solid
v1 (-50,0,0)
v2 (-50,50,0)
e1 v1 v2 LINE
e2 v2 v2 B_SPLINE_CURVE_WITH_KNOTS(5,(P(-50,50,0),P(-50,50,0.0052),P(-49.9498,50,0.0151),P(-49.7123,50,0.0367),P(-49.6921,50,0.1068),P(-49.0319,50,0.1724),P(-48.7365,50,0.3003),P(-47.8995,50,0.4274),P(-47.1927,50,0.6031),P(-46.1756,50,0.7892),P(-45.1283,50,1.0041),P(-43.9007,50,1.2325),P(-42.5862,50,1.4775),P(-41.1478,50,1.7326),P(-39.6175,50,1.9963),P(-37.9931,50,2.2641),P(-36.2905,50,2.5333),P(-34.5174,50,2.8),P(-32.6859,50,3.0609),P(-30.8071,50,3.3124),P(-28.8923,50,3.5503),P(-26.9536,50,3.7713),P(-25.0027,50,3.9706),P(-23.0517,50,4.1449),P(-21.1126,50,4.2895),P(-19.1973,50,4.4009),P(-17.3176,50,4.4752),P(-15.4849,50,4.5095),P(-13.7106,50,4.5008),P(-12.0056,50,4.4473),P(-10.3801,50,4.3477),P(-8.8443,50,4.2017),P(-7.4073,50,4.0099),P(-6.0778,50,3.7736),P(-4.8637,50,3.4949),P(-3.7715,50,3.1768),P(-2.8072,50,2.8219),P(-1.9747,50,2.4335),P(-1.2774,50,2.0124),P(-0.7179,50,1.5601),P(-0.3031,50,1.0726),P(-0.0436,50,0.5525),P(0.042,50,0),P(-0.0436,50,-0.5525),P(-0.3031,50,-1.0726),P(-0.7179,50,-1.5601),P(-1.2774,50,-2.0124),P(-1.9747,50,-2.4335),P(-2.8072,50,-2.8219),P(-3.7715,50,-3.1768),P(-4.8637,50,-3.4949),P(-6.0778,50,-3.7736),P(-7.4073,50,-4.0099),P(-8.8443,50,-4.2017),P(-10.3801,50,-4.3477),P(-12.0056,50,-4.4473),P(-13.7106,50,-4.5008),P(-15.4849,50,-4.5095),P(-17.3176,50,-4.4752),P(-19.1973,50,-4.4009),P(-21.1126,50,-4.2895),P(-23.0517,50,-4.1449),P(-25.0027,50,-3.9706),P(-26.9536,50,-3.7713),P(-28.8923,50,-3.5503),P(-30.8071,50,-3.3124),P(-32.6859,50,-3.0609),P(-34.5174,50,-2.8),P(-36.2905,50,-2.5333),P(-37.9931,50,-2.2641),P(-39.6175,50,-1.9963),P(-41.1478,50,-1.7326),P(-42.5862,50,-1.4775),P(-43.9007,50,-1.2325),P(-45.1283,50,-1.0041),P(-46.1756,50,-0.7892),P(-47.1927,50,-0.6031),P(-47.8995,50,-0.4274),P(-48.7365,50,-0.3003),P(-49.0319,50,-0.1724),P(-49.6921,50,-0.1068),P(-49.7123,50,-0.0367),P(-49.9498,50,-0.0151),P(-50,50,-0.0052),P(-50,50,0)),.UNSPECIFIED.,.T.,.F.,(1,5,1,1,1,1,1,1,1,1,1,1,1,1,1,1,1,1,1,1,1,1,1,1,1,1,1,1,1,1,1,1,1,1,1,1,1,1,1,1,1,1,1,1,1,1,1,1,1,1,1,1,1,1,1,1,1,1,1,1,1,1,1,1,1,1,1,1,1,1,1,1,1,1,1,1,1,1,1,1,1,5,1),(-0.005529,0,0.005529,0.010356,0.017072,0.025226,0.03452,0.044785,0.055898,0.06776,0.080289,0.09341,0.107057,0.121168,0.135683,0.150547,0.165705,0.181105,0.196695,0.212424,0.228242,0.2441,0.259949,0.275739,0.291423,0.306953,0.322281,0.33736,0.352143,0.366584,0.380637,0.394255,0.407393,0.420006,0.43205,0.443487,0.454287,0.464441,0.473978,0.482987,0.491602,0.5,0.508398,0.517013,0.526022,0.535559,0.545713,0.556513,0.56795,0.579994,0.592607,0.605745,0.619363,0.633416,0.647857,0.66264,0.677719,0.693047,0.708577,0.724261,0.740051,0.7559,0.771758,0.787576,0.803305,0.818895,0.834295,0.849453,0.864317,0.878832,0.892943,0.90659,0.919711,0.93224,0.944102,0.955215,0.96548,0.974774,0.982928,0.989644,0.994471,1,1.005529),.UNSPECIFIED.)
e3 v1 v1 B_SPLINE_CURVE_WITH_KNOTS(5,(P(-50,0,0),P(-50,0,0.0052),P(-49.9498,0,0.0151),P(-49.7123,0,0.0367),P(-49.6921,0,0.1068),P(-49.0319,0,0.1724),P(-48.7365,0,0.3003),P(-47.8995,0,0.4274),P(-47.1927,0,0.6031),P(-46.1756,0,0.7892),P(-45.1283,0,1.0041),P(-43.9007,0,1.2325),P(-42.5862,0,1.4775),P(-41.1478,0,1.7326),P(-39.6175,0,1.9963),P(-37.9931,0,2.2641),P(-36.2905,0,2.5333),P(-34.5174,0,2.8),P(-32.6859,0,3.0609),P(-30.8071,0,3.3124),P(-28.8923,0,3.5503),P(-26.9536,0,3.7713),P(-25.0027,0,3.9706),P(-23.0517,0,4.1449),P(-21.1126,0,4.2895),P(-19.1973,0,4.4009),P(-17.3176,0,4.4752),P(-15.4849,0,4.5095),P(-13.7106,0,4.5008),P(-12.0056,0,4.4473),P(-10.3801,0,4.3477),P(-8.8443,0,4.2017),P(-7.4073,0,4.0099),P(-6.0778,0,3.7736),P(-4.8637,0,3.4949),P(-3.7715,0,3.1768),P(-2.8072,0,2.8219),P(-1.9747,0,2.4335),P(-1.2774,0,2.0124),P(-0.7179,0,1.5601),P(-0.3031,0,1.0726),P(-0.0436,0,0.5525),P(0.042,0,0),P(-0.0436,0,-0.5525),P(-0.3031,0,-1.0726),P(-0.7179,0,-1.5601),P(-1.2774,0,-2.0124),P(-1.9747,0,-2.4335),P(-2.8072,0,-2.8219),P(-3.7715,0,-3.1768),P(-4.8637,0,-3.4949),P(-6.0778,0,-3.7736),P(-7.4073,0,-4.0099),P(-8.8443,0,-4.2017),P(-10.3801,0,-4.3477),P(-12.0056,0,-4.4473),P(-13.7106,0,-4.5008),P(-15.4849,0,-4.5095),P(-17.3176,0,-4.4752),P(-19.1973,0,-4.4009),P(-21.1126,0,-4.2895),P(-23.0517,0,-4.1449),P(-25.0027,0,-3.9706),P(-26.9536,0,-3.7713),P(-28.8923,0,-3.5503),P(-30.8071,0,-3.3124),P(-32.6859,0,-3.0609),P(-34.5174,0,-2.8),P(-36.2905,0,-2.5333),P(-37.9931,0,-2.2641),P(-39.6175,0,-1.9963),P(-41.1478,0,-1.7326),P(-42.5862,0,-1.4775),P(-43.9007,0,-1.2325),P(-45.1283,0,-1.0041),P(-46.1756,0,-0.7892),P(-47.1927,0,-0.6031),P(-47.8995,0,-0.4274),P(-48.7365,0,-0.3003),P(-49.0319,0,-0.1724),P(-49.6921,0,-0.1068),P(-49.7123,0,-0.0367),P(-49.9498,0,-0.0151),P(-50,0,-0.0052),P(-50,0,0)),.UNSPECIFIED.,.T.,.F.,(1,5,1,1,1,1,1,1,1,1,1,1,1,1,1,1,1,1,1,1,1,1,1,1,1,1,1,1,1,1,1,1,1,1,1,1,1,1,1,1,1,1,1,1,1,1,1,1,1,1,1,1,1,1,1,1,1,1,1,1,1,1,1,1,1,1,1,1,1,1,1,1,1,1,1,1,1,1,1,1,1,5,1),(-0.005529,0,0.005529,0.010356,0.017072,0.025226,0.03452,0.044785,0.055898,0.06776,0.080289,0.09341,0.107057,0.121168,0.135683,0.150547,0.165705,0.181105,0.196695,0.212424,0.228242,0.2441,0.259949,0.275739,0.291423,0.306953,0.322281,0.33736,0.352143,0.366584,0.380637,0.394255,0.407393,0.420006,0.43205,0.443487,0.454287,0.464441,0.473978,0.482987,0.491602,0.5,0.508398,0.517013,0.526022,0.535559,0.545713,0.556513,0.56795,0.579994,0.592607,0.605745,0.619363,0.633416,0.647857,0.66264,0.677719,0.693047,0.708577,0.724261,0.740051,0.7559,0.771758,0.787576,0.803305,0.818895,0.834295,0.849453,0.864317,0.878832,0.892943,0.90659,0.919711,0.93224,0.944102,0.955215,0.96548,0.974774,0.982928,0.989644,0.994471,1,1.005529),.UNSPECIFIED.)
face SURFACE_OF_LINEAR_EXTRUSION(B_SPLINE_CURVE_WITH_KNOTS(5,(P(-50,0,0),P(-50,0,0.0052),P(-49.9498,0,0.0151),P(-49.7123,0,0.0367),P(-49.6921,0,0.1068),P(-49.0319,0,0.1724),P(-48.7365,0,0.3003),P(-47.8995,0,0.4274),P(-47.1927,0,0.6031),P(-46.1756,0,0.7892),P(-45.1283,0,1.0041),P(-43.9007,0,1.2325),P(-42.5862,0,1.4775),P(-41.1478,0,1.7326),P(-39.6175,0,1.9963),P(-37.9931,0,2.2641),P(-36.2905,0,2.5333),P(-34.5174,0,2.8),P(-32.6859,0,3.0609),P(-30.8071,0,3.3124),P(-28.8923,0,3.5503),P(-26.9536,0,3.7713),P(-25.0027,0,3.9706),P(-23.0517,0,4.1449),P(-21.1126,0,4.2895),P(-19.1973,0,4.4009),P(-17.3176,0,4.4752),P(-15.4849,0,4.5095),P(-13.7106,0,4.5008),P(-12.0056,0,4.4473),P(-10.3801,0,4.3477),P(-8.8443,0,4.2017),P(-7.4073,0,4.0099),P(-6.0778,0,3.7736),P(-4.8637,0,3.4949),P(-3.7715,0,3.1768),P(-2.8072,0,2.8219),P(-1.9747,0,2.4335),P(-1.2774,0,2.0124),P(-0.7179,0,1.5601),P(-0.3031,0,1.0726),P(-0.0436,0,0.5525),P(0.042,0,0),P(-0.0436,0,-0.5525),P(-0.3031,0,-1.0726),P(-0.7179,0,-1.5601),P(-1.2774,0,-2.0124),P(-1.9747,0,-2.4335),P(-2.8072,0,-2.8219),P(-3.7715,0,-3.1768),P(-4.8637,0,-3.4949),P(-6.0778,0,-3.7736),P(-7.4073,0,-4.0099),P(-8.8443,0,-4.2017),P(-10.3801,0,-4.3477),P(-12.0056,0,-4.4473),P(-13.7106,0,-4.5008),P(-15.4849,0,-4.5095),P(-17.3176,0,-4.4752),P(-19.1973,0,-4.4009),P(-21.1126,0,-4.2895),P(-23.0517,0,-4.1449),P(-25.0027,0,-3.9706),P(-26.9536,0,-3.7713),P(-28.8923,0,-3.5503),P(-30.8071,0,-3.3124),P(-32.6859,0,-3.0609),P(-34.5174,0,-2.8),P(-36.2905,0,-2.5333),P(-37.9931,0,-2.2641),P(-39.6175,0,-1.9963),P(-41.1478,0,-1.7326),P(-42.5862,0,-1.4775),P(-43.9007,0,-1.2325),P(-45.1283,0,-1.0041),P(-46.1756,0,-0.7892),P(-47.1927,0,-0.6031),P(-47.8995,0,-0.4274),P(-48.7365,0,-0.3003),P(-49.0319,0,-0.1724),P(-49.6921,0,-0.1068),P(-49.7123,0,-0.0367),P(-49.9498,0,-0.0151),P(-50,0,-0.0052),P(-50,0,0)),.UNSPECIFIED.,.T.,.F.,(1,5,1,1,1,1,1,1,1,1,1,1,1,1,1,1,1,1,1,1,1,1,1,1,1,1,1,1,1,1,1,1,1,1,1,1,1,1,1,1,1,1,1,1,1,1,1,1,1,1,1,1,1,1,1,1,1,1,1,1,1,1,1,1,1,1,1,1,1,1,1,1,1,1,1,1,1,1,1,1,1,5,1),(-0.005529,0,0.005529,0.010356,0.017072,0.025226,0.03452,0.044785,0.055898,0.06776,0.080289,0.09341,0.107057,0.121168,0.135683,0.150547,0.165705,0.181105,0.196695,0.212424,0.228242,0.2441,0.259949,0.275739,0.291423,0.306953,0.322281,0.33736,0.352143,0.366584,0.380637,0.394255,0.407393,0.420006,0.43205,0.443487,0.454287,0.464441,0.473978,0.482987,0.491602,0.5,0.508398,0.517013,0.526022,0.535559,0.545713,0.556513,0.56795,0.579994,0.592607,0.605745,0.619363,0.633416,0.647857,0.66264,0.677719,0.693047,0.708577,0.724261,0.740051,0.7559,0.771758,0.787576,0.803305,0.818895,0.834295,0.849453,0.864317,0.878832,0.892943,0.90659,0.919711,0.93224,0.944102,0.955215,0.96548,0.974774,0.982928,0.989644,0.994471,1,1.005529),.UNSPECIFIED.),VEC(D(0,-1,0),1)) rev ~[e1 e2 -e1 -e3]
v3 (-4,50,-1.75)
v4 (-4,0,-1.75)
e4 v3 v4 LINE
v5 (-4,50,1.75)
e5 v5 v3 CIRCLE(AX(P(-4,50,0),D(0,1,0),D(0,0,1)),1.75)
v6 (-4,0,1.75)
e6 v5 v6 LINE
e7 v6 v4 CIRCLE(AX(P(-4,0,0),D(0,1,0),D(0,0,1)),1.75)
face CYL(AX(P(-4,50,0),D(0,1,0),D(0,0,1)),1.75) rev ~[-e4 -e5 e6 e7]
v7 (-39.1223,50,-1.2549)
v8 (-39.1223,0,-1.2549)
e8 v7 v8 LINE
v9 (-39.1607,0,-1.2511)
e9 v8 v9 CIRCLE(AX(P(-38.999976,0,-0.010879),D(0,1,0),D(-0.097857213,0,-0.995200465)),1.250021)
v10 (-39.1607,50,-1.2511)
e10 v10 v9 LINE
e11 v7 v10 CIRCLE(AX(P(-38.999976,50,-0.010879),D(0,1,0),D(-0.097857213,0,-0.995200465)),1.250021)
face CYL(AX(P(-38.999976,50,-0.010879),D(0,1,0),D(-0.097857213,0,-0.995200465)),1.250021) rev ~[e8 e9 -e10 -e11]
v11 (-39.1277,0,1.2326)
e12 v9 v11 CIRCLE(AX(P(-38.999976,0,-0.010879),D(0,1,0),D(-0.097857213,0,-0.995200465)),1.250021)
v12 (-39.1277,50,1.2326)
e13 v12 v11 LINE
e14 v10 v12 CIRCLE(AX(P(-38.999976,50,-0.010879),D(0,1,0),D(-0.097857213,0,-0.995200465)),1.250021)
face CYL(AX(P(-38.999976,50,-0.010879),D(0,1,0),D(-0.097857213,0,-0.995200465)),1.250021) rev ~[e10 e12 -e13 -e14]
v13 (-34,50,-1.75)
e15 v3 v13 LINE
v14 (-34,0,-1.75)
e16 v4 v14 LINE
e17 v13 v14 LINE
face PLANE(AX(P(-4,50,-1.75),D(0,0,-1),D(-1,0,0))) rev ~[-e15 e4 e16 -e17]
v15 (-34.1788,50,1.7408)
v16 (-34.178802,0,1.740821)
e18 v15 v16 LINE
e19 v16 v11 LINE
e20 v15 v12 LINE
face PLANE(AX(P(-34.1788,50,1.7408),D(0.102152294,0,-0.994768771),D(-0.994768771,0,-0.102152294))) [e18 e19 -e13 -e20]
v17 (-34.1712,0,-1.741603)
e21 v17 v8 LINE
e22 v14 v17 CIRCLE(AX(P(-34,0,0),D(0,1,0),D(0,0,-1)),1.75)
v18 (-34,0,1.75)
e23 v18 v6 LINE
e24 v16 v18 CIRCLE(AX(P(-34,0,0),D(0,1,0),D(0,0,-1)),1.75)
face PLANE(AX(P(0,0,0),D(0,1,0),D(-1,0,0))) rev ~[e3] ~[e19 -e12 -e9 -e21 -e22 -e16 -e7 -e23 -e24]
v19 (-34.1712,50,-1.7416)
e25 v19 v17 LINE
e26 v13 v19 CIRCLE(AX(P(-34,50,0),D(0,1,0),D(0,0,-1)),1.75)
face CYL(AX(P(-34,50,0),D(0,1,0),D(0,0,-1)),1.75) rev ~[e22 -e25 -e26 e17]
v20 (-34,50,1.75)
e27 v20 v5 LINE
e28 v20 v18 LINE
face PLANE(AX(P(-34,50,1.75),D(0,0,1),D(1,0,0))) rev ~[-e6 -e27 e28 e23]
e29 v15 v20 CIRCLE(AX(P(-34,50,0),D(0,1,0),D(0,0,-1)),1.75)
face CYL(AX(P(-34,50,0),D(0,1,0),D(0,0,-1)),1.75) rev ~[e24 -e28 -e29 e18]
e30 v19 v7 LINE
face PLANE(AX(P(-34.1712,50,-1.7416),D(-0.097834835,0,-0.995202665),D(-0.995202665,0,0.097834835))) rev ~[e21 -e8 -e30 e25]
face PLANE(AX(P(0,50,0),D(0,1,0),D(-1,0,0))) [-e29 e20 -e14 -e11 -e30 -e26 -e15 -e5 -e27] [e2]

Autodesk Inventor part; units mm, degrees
ref_plane "YZ Plane" through (0, 0, 0) normal (1, 0, 0) x (0, 1, 0)
ref_plane "XZ Plane" through (0, 0, 0) normal (0, 1, 0) x (-1, 0, 0)
ref_plane "XY Plane" through (0, 0, 0) normal (0, 0, 1) x (1, 0, 0)
sketch "草圖1" plane through (0, 0, 0) normal (0, 1, 0) x (-1, 0, 0)
  spline S0 degree 5 poles (50, 0) (50, 0.0052) (49.9498, 0.0151) (49.7123, 0.0367) (49.6921, 0.1068) (49.0319, 0.1724) (48.7365, 0.3003) (47.8995, 0.4274) (47.1927, 0.6031) (46.1756, 0.7892) (45.1283, 1.0041) (43.9007, 1.2325) (42.5862, 1.4775) (41.1478, 1.7326) (39.6175, 1.9963) (37.9931, 2.2641) (36.2905, 2.5333) (34.5174, 2.8) (32.6859, 3.0609) (30.8071, 3.3124) (28.8923, 3.5503) (26.9536, 3.7713) (25.0027, 3.9706) (23.0517, 4.1449) (21.1126, 4.2895) (19.1973, 4.4009) (17.3176, 4.4752) (15.4849, 4.5095) (13.7106, 4.5008) (12.0056, 4.4473) (10.3801, 4.3477) (8.8443, 4.2017) (7.4073, 4.0099) (6.0778, 3.7736) (4.8637, 3.4949) (3.7715, 3.1768) (2.8072, 2.8219) (1.9747, 2.4335) (1.2774, 2.0124) (0.7179, 1.5601) (0.3031, 1.0726) (0.0436, 0.5525) (-0.042, 0) (0.0436, -0.5525) (0.3031, -1.0726) (0.7179, -1.5601) (1.2774, -2.0124) (1.9747, -2.4335) (2.8072, -2.8219) (3.7715, -3.1768) (4.8637, -3.4949) (6.0778, -3.7736) (7.4073, -4.0099) (8.8443, -4.2017) (10.3801, -4.3477) (12.0056, -4.4473) (13.7106, -4.5008) (15.4849, -4.5095) (17.3176, -4.4752) (19.1973, -4.4009) (21.1126, -4.2895) (23.0517, -4.1449) (25.0027, -3.9706) (26.9536, -3.7713) (28.8923, -3.5503) (30.8071, -3.3124) (32.6859, -3.0609) (34.5174, -2.8) (36.2905, -2.5333) (37.9931, -2.2641) (39.6175, -1.9963) (41.1478, -1.7326) (42.5862, -1.4775) (43.9007, -1.2325) (45.1283, -1.0041) (46.1756, -0.7892) (47.1927, -0.6031) (47.8995, -0.4274) (48.7365, -0.3003) (49.0319, -0.1724) (49.6921, -0.1068) (49.7123, -0.0367) (49.9498, -0.0151) (50, -0.0052) (50, 0) knots 0 0 0 0 0 0 0.005529 0.010356 0.017072 0.025226 0.03452 0.044785 0.055898 0.06776 0.080289 0.09341 0.107057 0.121168 0.135683 0.150547 0.165705 0.181105 0.196695 0.212424 0.228242 0.2441 0.259949 0.275739 0.291423 0.306953 0.322281 0.33736 0.352143 0.366584 0.380637 0.394255 0.407393 0.420006 0.43205 0.443487 0.454287 0.464441 0.473978 0.482987 0.491602 0.5 0.508398 0.517013 0.526022 0.535559 0.545713 0.556513 0.56795 0.579994 0.592607 0.605745 0.619363 0.633416 0.647857 0.66264 0.677719 0.693047 0.708577 0.724261 0.740051 0.7559 0.771758 0.787576 0.803305 0.818895 0.834295 0.849453 0.864317 0.878832 0.892943 0.90659 0.919711 0.93224 0.944102 0.955215 0.96548 0.974774 0.982928 0.989644 0.994471 1 1 1 1 1 1
  point P0 (0, 0)
  point P1 (49.6922, 0.0669)
  point P2 (49.3093, 0.1492)
  point P3 (48.7764, 0.2626)
  point P4 (48.097, 0.4049)
  point P5 (47.2751, 0.5738)
  point P6 (46.316, 0.7666)
  point P7 (45.2254, 0.9803)
  point P8 (44.0102, 1.2119)
  point P9 (42.6776, 1.4579)
  point P10 (41.2362, 1.7151)
  point P11 (39.6947, 1.9804)
  point P12 (38.0624, 2.25)
  point P13 (36.3498, 2.5208)
  point P14 (34.5671, 2.7891)
  point P15 (32.7254, 3.0514)
  point P16 (30.8361, 3.3041)
  point P17 (28.9109, 3.5431)
  point P18 (26.9615, 3.7647)
  point P19 (25, 3.9646)
  point P20 (23.0385, 4.1388)
  point P21 (21.0892, 4.2831)
  point P22 (19.1639, 4.3937)
  point P23 (17.2746, 4.4668)
  point P24 (15.4329, 4.4992)
  point P25 (13.6503, 4.4881)
  point P26 (11.9376, 4.4316)
  point P27 (10.3054, 4.3284)
  point P28 (8.7638, 4.1781)
  point P29 (7.3224, 3.9812)
  point P30 (5.9898, 3.739)
  point P31 (4.7746, 3.4537)
  point P32 (3.684, 3.1279)
  point P33 (2.7249, 2.765)
  point P34 (1.903, 2.3685)
  point P35 (1.2236, 1.942)
  point P36 (0.6907, 1.4891)
  point P37 (0.3078, 1.0128)
  point P38 (0.0771, 0.5158)
  point P39 (0, 0)
  point P40 (0.0771, -0.5158)
  point P41 (0.3078, -1.0128)
  point P42 (0.6907, -1.4891)
  point P43 (1.2236, -1.942)
  point P44 (1.903, -2.3685)
  point P45 (2.7249, -2.765)
  point P46 (3.684, -3.1279)
  point P47 (4.7746, -3.4537)
  point P48 (5.9898, -3.739)
  point P49 (7.3224, -3.9812)
  point P50 (8.7638, -4.1781)
  point P51 (10.3054, -4.3284)
  point P52 (11.9376, -4.4316)
  point P53 (13.6503, -4.4881)
  point P54 (15.4329, -4.4992)
  point P55 (17.2746, -4.4668)
  point P56 (19.1639, -4.3937)
  point P57 (21.0892, -4.2831)
  point P58 (23.0385, -4.1388)
  point P59 (25, -3.9646)
  point P60 (26.9615, -3.7647)
  point P61 (28.9109, -3.5431)
  point P62 (30.8361, -3.3041)
  point P63 (32.7254, -3.0514)
  point P64 (34.5671, -2.7891)
  point P65 (36.3498, -2.5208)
  point P66 (38.0624, -2.25)
  point P67 (39.6947, -1.9804)
  point P68 (41.2362, -1.7151)
  point P69 (42.6776, -1.4579)
  point P70 (44.0102, -1.2119)
  point P71 (45.2254, -0.9803)
  point P72 (46.316, -0.7666)
  point P73 (47.2751, -0.5738)
  point P74 (48.097, -0.4049)
  point P75 (48.7764, -0.2626)
  point P76 (49.3093, -0.1492)
  point P77 (49.6922, -0.0669)
  point P78 (49.923, -0.0168)
extrude "擠出2" add sketch "草圖1" along normal blind 50
sketch "草圖2" plane through (0, 50, 0) normal (0, 1, 0) x (1, 0, 0)
  line L0 (-4, 0) -> (-34, 0) construction
  line L1 (-4, 1.75) -> (-34, 1.75)
  line L2 (-34, -1.75) -> (-4, -1.75)
  arc A0 (-4, -1.75) -> (-4, 1.75) centre (-4, 0) ccw
  arc A1 (-34, 1.75) -> (-34, -1.75) centre (-34, 0) ccw
  point P0 (0, 0)
  point P1 (-19, 0)
  dimension "d4" = 3.5
  dimension "d5" = 4
  dimension "d6" = 30
  dimension "d7" = 19
extrude "擠出3" cut sketch "草圖2" against normal through all
sketch "草圖3" plane through (0, 50, 0) normal (0, 1, 0) x (1, 0, 0)
  arc A0 (-39.1223, 1.2549) -> (-39.1277, -1.2326) centre (-39, 0.0109) ccw
  line L0 (-34, 1.75) -> (-4, 1.75) projected
  arc A1 (-34, 1.75) -> (-34, -1.75) centre (-34, 0) ccw projected
  line L1 (-4, -1.75) -> (-34, -1.75) projected
  line L2 (-34.1712, 1.7416) -> (-39.1607, 1.2511)
  line L3 (-34.1788, -1.7408) -> (-39.1277, -1.2326)
  arc A2 (-34.1712, 1.7416) -> (-34.1788, -1.7408) centre (-34, 0) ccw
  point P0 (0, 0)
  dimension "d10" = 2.5
  dimension "d11" = 5
  dimension "d12" = 5.615
  dimension "d13" = 3.0011
extrude "擠出4" cut sketch "草圖3" against normal through all
properties part number "0018"
